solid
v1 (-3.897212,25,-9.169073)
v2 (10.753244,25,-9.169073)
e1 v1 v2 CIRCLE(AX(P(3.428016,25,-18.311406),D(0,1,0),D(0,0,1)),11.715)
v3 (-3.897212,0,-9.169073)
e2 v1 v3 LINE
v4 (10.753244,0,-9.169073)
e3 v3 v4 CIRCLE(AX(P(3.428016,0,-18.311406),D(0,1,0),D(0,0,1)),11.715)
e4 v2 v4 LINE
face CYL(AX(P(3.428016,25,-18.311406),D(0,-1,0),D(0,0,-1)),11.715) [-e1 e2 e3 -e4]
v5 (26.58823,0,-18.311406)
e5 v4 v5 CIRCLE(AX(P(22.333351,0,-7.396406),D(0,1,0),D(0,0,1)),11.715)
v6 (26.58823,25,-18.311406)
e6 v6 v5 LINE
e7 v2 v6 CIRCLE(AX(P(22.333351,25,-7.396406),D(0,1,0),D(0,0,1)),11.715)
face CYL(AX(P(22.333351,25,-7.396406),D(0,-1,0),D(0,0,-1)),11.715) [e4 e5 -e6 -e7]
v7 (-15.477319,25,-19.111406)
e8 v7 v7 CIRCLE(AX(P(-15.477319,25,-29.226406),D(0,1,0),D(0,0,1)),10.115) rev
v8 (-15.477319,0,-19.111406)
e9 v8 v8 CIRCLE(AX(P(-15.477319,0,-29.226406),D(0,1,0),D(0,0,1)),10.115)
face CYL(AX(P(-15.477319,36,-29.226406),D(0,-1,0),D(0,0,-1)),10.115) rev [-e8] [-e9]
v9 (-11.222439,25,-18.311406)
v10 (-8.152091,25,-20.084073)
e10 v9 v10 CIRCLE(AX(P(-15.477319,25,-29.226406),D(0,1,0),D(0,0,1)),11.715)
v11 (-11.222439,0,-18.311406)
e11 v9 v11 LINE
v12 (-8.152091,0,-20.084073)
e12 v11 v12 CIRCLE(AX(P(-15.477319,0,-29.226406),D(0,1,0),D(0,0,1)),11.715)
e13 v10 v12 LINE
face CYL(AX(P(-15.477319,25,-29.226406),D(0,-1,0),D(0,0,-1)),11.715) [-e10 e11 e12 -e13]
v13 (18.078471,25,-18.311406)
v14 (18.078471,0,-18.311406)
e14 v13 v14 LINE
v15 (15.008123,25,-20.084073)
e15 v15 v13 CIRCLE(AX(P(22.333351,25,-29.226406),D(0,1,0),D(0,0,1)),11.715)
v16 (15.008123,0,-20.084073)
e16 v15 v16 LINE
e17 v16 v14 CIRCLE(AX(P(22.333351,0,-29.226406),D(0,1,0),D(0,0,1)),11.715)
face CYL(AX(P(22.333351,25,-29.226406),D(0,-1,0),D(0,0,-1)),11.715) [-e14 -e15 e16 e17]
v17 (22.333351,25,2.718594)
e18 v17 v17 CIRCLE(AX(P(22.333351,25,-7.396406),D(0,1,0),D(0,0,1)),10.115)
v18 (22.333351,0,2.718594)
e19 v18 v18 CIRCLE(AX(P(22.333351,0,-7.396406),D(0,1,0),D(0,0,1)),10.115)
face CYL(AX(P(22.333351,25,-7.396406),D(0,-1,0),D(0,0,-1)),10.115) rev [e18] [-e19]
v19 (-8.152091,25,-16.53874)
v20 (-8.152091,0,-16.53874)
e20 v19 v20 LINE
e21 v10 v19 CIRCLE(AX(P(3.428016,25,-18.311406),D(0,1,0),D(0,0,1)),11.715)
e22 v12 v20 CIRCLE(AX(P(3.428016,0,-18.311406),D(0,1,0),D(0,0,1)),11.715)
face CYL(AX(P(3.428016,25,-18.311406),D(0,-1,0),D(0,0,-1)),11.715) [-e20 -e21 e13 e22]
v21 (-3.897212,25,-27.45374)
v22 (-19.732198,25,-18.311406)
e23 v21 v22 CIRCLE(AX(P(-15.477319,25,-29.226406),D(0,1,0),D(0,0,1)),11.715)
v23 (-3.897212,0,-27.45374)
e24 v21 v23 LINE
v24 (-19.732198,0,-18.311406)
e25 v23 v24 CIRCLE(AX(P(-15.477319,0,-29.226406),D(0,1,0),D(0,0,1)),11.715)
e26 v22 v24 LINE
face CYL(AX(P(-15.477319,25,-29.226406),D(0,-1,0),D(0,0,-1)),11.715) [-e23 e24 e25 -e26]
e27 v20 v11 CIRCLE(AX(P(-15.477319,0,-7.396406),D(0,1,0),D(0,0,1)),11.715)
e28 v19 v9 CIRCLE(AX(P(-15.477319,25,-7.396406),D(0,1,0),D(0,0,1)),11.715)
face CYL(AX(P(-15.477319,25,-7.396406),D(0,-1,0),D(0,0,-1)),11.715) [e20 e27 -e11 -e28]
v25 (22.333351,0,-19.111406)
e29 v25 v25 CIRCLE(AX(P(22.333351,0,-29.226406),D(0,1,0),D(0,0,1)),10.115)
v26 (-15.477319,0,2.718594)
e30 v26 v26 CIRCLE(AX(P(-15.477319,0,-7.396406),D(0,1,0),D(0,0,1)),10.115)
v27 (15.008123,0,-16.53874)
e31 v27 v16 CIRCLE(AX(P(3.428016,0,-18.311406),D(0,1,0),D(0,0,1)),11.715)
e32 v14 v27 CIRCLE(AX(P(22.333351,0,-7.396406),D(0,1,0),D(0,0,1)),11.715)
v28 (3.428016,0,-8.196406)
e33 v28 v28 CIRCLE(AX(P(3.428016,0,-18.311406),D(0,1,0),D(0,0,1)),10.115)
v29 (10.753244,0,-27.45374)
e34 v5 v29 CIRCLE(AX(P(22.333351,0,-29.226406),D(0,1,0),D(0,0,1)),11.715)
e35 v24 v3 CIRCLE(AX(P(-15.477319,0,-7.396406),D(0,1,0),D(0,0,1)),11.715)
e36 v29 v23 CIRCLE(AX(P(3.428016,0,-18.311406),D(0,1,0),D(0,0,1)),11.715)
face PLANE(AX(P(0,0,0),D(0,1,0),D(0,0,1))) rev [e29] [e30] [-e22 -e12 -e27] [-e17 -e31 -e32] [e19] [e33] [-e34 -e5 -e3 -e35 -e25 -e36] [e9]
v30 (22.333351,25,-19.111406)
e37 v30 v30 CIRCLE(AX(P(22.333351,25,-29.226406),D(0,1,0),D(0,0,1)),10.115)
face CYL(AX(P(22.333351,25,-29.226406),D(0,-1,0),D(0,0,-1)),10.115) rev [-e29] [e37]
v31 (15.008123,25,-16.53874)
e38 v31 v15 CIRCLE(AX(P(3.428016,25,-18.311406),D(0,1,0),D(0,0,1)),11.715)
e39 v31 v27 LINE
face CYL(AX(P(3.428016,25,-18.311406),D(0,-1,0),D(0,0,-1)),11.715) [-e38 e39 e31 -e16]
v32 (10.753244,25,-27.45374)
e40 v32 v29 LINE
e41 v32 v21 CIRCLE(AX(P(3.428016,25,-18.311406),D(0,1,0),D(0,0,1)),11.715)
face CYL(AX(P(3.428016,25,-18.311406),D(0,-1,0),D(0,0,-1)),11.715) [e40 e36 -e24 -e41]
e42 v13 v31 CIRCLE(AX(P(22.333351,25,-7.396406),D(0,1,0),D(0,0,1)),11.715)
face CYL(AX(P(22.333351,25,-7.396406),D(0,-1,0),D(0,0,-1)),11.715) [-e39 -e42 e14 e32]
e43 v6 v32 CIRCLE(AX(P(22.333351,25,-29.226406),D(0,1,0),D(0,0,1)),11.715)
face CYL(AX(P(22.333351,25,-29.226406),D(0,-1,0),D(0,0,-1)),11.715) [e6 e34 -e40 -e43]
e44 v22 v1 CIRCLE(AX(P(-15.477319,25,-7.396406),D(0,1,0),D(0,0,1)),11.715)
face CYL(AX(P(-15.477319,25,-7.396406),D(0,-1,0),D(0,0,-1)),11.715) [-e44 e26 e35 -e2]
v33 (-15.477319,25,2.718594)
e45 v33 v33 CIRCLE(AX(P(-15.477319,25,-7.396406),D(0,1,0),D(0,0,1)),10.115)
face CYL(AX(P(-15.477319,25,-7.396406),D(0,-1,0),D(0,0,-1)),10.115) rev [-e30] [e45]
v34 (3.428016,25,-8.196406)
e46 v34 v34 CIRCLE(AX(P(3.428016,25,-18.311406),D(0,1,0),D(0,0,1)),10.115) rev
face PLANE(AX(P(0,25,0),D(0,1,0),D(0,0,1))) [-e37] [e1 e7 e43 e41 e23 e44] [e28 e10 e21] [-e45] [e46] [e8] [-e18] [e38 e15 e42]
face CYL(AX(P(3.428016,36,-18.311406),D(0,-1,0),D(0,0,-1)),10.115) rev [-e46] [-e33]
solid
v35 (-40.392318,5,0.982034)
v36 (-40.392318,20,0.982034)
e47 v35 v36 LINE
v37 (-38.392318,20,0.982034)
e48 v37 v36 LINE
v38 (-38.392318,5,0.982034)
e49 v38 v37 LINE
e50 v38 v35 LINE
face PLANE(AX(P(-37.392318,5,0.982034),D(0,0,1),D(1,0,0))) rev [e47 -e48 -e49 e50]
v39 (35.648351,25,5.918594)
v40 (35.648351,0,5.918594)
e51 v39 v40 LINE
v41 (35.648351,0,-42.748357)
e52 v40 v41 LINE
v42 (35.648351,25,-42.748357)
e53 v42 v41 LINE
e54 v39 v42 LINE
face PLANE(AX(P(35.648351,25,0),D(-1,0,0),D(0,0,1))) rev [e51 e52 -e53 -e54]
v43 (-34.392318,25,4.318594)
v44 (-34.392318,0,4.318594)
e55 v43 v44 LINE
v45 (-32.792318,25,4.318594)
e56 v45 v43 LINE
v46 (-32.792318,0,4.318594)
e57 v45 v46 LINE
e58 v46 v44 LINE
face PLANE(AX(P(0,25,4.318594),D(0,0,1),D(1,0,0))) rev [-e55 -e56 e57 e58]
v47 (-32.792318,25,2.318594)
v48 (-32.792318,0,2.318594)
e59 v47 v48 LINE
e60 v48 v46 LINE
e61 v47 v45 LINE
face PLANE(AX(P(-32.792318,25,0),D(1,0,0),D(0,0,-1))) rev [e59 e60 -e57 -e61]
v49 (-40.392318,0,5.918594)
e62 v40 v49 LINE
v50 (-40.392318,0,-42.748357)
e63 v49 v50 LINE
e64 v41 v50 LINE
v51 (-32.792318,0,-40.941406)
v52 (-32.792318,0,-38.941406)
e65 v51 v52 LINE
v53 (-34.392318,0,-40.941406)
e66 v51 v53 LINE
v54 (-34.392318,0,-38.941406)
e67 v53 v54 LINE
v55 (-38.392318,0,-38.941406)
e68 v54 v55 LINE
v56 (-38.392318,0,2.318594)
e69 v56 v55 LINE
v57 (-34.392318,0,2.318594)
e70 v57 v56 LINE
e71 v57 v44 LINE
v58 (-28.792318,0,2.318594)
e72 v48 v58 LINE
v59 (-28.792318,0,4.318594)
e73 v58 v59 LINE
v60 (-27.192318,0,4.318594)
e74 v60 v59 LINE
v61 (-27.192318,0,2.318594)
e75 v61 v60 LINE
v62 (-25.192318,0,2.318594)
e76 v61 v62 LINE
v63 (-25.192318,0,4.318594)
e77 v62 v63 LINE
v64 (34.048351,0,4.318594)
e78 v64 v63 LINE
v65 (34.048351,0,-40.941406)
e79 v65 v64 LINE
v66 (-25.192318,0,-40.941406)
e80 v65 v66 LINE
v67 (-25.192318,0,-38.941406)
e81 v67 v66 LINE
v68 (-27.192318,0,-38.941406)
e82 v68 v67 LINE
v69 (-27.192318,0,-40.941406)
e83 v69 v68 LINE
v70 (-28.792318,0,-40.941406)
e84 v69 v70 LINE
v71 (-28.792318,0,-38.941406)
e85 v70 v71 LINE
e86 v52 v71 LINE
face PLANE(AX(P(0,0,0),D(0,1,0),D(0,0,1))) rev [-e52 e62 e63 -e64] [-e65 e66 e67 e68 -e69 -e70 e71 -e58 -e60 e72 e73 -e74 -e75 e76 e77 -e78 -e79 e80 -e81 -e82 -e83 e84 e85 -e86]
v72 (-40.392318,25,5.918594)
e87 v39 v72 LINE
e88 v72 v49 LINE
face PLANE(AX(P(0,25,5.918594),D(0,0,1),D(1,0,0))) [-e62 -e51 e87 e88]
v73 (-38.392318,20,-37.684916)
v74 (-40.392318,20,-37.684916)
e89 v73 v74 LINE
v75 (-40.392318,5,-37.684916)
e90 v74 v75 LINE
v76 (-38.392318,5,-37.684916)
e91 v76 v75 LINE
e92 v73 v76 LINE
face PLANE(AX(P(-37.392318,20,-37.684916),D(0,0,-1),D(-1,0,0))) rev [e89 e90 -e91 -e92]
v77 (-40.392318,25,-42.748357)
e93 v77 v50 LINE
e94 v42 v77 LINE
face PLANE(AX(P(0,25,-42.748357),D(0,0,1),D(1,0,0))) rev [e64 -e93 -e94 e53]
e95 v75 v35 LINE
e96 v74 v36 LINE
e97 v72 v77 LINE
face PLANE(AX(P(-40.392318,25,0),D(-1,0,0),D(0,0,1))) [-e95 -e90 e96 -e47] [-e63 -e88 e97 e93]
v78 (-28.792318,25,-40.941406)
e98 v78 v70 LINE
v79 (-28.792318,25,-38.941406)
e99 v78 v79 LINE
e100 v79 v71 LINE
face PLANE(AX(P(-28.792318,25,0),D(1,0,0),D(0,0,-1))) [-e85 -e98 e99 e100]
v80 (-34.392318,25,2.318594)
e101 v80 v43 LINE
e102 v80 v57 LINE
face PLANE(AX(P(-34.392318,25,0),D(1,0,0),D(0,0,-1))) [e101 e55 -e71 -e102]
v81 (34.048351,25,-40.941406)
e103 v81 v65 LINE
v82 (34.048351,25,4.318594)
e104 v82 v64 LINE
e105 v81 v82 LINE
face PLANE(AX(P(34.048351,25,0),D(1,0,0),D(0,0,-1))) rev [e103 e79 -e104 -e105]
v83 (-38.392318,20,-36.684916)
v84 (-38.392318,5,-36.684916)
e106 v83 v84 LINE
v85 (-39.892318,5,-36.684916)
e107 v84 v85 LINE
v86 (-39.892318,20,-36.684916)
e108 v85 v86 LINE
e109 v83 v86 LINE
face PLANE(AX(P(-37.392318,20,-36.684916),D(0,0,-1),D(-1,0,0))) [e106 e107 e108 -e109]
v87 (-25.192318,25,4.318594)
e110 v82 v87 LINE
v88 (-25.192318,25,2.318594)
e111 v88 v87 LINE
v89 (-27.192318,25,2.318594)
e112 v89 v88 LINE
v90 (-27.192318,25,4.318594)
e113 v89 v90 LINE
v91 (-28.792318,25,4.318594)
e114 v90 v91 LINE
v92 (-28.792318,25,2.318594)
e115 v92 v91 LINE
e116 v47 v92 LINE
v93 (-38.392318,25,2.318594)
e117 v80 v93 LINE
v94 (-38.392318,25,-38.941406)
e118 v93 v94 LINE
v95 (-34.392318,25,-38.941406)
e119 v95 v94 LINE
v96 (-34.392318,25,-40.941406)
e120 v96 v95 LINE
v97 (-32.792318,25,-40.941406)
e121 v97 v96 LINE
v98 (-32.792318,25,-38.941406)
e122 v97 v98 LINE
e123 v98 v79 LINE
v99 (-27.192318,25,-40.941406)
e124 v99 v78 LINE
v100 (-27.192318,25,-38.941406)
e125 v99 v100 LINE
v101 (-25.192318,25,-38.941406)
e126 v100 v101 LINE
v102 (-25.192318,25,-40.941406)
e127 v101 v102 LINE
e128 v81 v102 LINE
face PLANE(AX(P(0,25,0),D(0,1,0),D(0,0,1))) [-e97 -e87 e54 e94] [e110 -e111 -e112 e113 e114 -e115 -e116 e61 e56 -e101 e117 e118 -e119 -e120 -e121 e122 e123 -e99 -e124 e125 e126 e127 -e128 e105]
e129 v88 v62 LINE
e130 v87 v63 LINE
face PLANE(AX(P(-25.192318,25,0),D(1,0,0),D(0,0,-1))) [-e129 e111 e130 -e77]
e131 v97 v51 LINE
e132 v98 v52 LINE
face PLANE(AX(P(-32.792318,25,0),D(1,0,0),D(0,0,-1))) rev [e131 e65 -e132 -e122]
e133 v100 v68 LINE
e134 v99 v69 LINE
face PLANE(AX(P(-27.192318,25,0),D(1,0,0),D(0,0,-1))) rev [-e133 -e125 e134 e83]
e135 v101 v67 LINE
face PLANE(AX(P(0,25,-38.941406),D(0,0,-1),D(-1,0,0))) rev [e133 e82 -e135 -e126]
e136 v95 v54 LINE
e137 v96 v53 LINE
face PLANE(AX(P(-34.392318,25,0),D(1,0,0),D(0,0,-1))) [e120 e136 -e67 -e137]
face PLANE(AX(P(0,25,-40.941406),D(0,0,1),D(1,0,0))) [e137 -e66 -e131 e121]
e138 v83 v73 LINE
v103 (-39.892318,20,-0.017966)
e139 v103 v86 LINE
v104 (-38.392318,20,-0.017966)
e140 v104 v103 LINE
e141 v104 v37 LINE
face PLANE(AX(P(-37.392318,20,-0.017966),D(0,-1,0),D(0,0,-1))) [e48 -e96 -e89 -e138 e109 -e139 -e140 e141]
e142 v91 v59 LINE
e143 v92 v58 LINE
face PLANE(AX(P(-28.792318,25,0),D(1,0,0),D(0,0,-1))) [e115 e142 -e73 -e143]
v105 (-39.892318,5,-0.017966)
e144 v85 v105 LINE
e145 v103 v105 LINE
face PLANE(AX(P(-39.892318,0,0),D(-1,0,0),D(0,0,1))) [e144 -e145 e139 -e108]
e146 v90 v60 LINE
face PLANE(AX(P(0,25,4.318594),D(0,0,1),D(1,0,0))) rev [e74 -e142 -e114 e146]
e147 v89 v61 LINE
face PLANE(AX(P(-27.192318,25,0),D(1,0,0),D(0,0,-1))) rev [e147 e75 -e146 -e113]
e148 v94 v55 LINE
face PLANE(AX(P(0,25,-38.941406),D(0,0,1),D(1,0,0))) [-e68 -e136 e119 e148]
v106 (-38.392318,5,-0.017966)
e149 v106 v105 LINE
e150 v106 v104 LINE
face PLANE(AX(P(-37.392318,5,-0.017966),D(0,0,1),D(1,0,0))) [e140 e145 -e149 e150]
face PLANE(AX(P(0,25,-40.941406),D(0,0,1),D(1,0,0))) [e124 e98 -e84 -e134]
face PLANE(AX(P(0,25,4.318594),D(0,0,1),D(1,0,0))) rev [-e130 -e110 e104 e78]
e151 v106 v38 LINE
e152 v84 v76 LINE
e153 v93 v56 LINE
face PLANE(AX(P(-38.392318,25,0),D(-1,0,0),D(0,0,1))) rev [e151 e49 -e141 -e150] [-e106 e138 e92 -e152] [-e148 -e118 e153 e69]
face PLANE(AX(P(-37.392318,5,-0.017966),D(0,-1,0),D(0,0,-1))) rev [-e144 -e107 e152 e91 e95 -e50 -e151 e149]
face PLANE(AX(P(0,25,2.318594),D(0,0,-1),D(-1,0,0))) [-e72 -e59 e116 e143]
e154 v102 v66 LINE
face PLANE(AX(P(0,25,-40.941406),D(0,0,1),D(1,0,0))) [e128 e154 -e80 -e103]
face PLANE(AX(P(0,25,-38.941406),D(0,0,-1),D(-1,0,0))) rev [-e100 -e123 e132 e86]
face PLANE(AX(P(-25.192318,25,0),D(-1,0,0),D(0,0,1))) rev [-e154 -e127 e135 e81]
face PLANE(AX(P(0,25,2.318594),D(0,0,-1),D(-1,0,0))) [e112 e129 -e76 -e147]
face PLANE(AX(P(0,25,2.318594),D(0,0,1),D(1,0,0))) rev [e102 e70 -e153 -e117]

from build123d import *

# Parameters (mm, degrees)
SKETCH1_R             = 10.115000047
BOSS_EXTRUDE4_DEPTH   = 25
SKETCH1_W             = 76.040669035
SKETCH1_H             = 48.666950676
BOSS_EXTRUDE4_2_DEPTH = 25
SKETCH1_9_R           = 10.115000047
CUT_EXTRUDE1_DEPTH    = 36
SKETCH4_W             = 1
SKETCH4_H             = 15
CUT_EXTRUDE3_DEPTH    = 3
SKETCH5_W             = 38.666950676
SKETCH5_H             = 15
CUT_EXTRUDE4_DEPTH    = 0.5


with BuildPart() as part:
    # Sketch1 → Boss-Extrude4 (new body)
    with BuildSketch(Plane(origin=(0, 0, 0), x_dir=(1, 0, 0), z_dir=(0, 1, 0))):
        with BuildLine():
            ThreePointArc((22.33335059, 40.941406253), (13.444930876, 36.857737704), (10.753243591, 27.45373997))
            ThreePointArc((10.753243591, 27.45373997), (3.42801602, 30.026406253), (-3.897211552, 27.45373997))
            ThreePointArc((-3.897211552, 27.45373997), (-6.588898838, 36.857737705), (-15.477318554, 40.941406253))
            ThreePointArc((-15.477318554, 40.941406253), (-26.990581515, 31.391123299), (-19.732197967, 18.3114063))
            ThreePointArc((-19.732197967, 18.3114063), (-26.990581514, 5.231689296), (-15.477318545, -4.318593653))
            ThreePointArc((-15.477318545, -4.318593653), (-6.588898835, -0.234925102), (-3.897211552, 9.16907263))
            ThreePointArc((-3.897211552, 9.16907263), (3.42801602, 6.596406347), (10.753243591, 9.16907263))
            ThreePointArc((10.753243591, 9.16907263), (13.444930875, -0.234925102), (22.333350586, -4.318593653))
            ThreePointArc((22.333350586, -4.318593653), (30.617106493, -0.887349608), (34.048350537, 7.3964063))
            ThreePointArc((34.048350537, 7.3964063), (32.005142976, 14.006826546), (26.588230006, 18.3114063))
            ThreePointArc((26.588230006, 18.3114063), (32.005142976, 22.615986054), (34.048350537, 29.2264063))
            ThreePointArc((34.048350537, 29.2264063), (30.617106494, 37.510162206), (22.33335059, 40.941406253))
        make_face()
        with Locations((22.333350584, 29.2264063)):
            Circle(SKETCH1_R, mode=Mode.SUBTRACT)
        with BuildLine():
            ThreePointArc((15.008123013, 20.08407263), (16.475850608, 19.080918735), (18.078471162, 18.3114063))
            ThreePointArc((18.078471162, 18.3114063), (16.475850608, 17.541893865), (15.008123013, 16.53873997))
            ThreePointArc((15.008123013, 16.53873997), (15.143015973, 18.3114063), (15.008123013, 20.08407263))
        make_face(mode=Mode.SUBTRACT)
        with Locations((22.333350584, 7.3964063)):
            Circle(SKETCH1_R, mode=Mode.SUBTRACT)
        with BuildLine():
            ThreePointArc((-8.152090974, 16.53873997), (-9.619818569, 17.541893865), (-11.222439123, 18.3114063))
            ThreePointArc((-11.222439123, 18.3114063), (-9.619818569, 19.080918735), (-8.152090974, 20.08407263))
            ThreePointArc((-8.152090974, 20.08407263), (-8.286983933, 18.3114063), (-8.152090974, 16.53873997))
        make_face(mode=Mode.SUBTRACT)
        with Locations((-15.477318545, 7.3964063)):
            Circle(SKETCH1_R, mode=Mode.SUBTRACT)
    extrude(amount=BOSS_EXTRUDE4_DEPTH)

    # Sketch1<9> → Cut-Extrude1 (cut)
    with BuildSketch(Plane(origin=(0, 0, 0), x_dir=(1, 0, 0), z_dir=(0, 1, 0))):
        with Locations((3.42801602, 18.3114063)):
            Circle(SKETCH1_9_R)
        with Locations((-15.477318545, 29.2264063)):
            Circle(SKETCH1_9_R)
    extrude(amount=CUT_EXTRUDE1_DEPTH, mode=Mode.SUBTRACT)


with BuildPart() as body_2:
    # Sketch1 → Boss-Extrude4 2 (new body)
    with BuildSketch(Plane(origin=(0, 0, 0), x_dir=(1, 0, 0), z_dir=(0, 1, 0))):
        with Locations((-2.371983981, 18.414881685)):
            Rectangle(SKETCH1_W, SKETCH1_H)
        Polygon((-25.192318498, 38.941406253), (-25.192318498, 40.941406253), (-15.477318554, 40.941406253), (22.33335059, 40.941406253), (34.048350537, 40.941406253), (34.048350537, 29.2264063), (34.048350537, 7.3964063), (34.048350537, -4.318593653), (22.333350586, -4.318593653), (-15.477318545, -4.318593653), (-25.192318498, -4.318593653), (-25.192318498, -2.318593653), (-27.192318498, -2.318593653), (-27.192318498, -4.318593653), (-28.792318498, -4.318593653), (-28.792318498, -2.318593653), (-32.792318498, -2.318593653), (-32.792318498, -4.318593653), (-34.392318498, -4.318593653), (-34.392318498, -2.318593653), (-38.392318498, -2.318593653), (-38.392318498, 38.941406253), (-34.392318498, 38.941406253), (-34.392318498, 40.941406253), (-32.792318498, 40.941406253), (-32.792318498, 38.941406253), (-28.792318498, 38.941406253), (-28.792318498, 40.941406253), (-27.192318498, 40.941406253), (-27.192318498, 38.941406253), align=None, mode=Mode.SUBTRACT)
    extrude(amount=BOSS_EXTRUDE4_2_DEPTH)

    # Sketch4 → Cut-Extrude3 (cut)
    with BuildSketch(Plane.ZY.offset(40.392318498)):
        with Locations((0.482034275, 12.5)):
            Rectangle(SKETCH4_W, SKETCH4_H)
        with Locations((-37.184916401, 12.5)):
            Rectangle(SKETCH4_W, SKETCH4_H)
    extrude(amount=-CUT_EXTRUDE3_DEPTH, mode=Mode.SUBTRACT)

    # Sketch5 → Cut-Extrude4 (cut)
    with BuildSketch(Plane.ZY.offset(40.392318498)):
        with Locations((-18.351441063, 12.5)):
            Rectangle(SKETCH5_W, SKETCH5_H)
    extrude(amount=-CUT_EXTRUDE4_DEPTH, mode=Mode.SUBTRACT)


solid = Compound([part.part, body_2.part])
